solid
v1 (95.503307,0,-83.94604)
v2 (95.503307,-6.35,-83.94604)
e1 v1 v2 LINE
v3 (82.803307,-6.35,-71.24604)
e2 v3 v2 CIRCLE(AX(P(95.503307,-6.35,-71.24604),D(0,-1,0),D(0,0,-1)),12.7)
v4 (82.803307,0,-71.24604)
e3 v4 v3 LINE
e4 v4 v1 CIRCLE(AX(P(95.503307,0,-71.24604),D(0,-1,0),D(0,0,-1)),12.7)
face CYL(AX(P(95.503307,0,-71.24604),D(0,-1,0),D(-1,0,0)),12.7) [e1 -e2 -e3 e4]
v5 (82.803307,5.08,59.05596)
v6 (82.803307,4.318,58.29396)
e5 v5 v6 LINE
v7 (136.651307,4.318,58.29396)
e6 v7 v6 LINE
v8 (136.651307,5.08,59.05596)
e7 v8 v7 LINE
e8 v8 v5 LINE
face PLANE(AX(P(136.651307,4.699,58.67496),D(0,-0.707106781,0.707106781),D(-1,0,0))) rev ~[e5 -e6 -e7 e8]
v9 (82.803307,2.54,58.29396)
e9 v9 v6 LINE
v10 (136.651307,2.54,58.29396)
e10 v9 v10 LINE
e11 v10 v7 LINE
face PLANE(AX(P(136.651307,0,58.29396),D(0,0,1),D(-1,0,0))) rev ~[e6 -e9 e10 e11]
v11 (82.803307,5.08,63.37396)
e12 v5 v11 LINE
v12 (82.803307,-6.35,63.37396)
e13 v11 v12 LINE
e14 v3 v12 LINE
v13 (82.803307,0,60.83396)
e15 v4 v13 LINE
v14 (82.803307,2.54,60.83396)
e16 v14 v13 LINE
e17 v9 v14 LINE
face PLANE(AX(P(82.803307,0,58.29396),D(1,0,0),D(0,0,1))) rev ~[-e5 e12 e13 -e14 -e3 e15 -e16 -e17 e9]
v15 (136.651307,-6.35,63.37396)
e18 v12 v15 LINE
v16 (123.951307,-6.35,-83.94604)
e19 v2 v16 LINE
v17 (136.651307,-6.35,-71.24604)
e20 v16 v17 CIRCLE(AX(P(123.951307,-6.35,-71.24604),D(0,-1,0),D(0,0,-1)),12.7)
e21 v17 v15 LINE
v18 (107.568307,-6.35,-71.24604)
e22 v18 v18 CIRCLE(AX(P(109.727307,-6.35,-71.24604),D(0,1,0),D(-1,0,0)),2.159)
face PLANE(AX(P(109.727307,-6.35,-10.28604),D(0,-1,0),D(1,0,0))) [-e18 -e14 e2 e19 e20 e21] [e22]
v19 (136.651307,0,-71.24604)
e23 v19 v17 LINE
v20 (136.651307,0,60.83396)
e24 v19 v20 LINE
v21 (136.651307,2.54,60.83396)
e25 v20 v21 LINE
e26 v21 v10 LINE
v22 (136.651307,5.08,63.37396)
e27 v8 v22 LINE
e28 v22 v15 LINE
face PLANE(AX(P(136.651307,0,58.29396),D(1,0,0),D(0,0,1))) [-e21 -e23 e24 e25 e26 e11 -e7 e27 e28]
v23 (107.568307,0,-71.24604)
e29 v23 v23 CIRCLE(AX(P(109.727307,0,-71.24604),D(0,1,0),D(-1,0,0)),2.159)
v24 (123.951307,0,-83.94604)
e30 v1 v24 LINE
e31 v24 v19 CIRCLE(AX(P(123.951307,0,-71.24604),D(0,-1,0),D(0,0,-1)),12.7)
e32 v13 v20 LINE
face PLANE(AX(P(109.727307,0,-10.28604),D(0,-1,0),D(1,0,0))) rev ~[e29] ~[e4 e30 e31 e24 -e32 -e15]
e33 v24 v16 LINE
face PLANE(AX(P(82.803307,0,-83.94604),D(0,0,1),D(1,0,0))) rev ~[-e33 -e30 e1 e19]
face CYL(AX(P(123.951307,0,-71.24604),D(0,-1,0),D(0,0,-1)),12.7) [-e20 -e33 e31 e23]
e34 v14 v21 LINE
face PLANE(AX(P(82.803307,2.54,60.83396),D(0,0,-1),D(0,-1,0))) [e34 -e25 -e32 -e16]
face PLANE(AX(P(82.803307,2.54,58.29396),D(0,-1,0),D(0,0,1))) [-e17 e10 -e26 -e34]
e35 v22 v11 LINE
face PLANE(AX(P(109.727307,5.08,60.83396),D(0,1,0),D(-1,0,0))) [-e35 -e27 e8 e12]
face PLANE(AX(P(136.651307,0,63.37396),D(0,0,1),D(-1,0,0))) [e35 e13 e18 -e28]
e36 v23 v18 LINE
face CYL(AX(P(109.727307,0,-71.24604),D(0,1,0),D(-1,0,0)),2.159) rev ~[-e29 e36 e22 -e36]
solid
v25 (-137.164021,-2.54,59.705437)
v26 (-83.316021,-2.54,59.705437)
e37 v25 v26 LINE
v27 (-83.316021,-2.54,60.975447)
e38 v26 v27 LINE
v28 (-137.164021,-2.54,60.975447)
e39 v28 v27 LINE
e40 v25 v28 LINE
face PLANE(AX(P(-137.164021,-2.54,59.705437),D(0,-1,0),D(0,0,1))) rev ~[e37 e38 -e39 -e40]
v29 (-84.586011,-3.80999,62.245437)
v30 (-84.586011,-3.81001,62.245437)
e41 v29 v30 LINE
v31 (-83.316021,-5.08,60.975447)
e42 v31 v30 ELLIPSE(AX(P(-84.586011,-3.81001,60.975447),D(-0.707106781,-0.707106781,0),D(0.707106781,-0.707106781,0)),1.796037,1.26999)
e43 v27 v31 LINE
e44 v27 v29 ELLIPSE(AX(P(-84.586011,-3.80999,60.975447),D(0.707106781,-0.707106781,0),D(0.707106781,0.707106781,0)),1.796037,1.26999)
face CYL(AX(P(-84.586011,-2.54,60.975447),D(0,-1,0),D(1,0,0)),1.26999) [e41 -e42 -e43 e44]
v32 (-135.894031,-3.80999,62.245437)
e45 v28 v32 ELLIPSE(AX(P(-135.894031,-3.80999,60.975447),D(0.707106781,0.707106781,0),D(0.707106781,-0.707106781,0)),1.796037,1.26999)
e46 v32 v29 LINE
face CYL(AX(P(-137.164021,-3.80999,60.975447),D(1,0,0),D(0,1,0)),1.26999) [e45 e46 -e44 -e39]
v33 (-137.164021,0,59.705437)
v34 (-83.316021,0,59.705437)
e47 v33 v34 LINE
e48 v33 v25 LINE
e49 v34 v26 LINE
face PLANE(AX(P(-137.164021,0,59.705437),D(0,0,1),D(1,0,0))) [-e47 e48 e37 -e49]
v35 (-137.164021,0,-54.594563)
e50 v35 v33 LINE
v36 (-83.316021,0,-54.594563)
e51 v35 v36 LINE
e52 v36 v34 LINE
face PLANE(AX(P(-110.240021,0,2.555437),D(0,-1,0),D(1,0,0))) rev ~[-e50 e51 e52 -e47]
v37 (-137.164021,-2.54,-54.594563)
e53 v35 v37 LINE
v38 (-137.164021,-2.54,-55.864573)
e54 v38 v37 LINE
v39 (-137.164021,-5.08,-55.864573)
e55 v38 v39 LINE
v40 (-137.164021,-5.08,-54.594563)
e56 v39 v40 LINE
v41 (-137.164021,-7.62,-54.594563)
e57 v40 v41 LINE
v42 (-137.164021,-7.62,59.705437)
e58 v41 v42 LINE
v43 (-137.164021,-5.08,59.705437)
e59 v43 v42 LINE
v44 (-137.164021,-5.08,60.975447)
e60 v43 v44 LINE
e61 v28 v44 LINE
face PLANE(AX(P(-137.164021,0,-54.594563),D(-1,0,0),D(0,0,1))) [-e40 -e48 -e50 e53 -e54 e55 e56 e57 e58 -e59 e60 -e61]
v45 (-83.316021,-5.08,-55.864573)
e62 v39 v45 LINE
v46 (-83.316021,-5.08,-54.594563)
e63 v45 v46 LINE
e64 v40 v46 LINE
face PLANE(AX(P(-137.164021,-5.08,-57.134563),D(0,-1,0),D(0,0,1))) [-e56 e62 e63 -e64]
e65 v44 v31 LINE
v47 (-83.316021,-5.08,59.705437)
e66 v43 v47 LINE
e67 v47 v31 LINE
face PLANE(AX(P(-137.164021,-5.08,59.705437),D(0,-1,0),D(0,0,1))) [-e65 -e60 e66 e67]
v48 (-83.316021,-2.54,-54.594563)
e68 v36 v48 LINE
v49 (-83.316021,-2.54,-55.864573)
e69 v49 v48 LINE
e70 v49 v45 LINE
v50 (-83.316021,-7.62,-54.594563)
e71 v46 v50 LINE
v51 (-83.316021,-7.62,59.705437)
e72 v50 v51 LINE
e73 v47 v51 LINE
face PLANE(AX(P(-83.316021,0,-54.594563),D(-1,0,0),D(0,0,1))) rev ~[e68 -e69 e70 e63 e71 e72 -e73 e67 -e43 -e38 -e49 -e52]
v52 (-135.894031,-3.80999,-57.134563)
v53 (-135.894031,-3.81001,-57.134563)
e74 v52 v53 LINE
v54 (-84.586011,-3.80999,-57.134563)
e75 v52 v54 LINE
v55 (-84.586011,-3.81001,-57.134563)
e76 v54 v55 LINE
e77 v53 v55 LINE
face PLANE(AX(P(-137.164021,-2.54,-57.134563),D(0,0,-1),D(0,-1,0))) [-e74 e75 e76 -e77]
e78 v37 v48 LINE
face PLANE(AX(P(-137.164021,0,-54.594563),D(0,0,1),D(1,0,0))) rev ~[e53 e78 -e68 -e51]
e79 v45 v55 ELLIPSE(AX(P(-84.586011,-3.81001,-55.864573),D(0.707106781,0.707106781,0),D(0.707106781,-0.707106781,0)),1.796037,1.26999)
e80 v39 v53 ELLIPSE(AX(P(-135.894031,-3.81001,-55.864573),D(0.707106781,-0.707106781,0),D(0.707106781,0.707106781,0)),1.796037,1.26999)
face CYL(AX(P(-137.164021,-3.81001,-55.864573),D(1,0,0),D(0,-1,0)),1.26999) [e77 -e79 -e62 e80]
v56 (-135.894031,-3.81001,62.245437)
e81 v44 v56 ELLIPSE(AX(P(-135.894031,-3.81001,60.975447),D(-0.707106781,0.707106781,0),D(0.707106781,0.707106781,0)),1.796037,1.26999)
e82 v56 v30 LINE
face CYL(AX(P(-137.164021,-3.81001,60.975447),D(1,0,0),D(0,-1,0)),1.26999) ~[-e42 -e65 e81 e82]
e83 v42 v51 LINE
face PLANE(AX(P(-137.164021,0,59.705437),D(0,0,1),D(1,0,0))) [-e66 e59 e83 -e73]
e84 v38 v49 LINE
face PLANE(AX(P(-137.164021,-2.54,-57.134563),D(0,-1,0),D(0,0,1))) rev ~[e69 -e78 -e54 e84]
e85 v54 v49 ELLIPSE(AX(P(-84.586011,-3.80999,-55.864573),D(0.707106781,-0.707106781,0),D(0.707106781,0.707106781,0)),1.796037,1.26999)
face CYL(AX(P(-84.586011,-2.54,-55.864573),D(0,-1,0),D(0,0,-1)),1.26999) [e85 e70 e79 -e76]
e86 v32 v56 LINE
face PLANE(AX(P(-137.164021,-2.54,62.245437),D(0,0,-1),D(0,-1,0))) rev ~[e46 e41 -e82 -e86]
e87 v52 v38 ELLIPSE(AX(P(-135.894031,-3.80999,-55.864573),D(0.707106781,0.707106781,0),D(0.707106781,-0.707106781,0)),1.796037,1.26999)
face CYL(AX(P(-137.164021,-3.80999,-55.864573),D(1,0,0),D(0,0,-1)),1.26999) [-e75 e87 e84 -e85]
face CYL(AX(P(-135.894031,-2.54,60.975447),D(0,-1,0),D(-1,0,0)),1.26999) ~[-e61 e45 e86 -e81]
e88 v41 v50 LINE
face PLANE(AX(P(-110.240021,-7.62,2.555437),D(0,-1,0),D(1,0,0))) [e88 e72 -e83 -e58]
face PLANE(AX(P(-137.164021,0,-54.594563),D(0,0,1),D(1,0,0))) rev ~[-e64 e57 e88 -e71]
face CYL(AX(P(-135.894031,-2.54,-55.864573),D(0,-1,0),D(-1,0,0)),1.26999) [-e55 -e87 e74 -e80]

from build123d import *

# Parameters (mm, degrees)
F0_W      = 53.848
F0_H      = 114.3
F1_DEPTH  = 7.62
F2_W      = 2.54
F2_H      = 2.54
F3_DEPTH  = 53.848
F4_R      = 1.26999
F5_R      = 1.26999
F6_W      = 53.848
F6_H      = 147.32
F7_DEPTH  = 6.35
F8_R      = 12.7
F9_W      = 53.848
F9_H      = 5.08
F10_DEPTH = 5.08
F11_W     = 2.54
F11_H     = 2.54
F12_DEPTH = 76.2
F13_SIZE  = 0.762
F14_R     = 2.159
F15_DEPTH = 25.4


# Not quite as in the source:
# - a fillet or chamfer is up to 0.001 mm smaller than in the source, because OpenCascade refuses the exact size


with BuildPart() as f1:
    # F0 (on Front) → F1 (new body)
    with BuildSketch(Plane.XZ):
        with Locations((-110.2400206625, 2.555437386)):
            Rectangle(F0_W, F0_H)
    extrude(amount=F1_DEPTH)

    # F2 (on face) → F3 (join)
    with BuildSketch(Plane(origin=(-137.1640206625, 0, 0), x_dir=(0, -1, 0), z_dir=(-1, 0, 0))):
        with Locations((3.81, -55.864562614)):
            Rectangle(F2_W, F2_H)
        with Locations((3.81, 60.975437386)):
            Rectangle(F2_W, F2_H)
    extrude(amount=-F3_DEPTH)

    # F4 (radius 1.27 in the source; OpenCascade refuses exactly that, so slightly less here)
    f4_edges = [f1.edges().sort_by_distance(p)[0] for p in [
        (-110.240021, -2.54, 62.245437),
        (-110.240021, -5.08, 62.245437),
        (-137.164021, -3.81, 62.245437),
        (-83.316021, -3.81, 62.245437),
    ]]
    fillet(f4_edges, radius=F4_R)

    # F5 (radius 1.27 in the source; OpenCascade refuses exactly that, so slightly less here)
    f5_edges = [f1.edges().sort_by_distance(p)[0] for p in [
        (-110.240021, -5.08, -57.134563),
        (-110.240021, -2.54, -57.134563),
        (-83.316021, -3.81, -57.134563),
        (-137.164021, -3.81, -57.134563),
    ]]
    fillet(f5_edges, radius=F5_R)


with BuildPart() as f7:
    # F6 (on Front) → F7 (new body)
    with BuildSketch(Plane.XZ):
        with Locations((109.727306695, -10.2860404956)):
            Rectangle(F6_W, F6_H)
    extrude(amount=F7_DEPTH)

    # F8
    f8_edges = [f7.edges().sort_by_distance(p)[0] for p in [
        (136.651307, -3.175, -83.94604),
        (82.803307, -3.175, -83.94604),
    ]]
    fillet(f8_edges, radius=F8_R)

    # F9 (on face) → F10 (join)
    with BuildSketch(Plane(origin=(0, 0, 0), x_dir=(-1, 0, 0), z_dir=(0, 1, 0))):
        with Locations((-109.727306695, 60.8339595044)):
            Rectangle(F9_W, F9_H)
    extrude(amount=F10_DEPTH)

    # F11 (on face) → F12 (cut)
    with BuildSketch(Plane(origin=(82.803306695, 0, 0), x_dir=(0, -1, 0), z_dir=(-1, 0, 0))):
        with Locations((-1.27, 59.5639595044)):
            Rectangle(F11_W, F11_H)
    extrude(amount=-F12_DEPTH, mode=Mode.SUBTRACT)

    # F13
    f13_edges = [f7.edges().sort_by_distance(p)[0] for p in [
        (109.727307, 5.08, 58.29396),
    ]]
    chamfer(f13_edges, length=F13_SIZE)

    # F14 (on face) → F15 (cut)
    with BuildSketch(Plane(origin=(0, 0, 0), x_dir=(-1, 0, 0), z_dir=(0, 1, 0))):
        with Locations((-109.727306695, -71.2460404956)):
            Circle(F14_R)
    extrude(amount=-F15_DEPTH, mode=Mode.SUBTRACT)


solid = Compound([f1.part, f7.part])
